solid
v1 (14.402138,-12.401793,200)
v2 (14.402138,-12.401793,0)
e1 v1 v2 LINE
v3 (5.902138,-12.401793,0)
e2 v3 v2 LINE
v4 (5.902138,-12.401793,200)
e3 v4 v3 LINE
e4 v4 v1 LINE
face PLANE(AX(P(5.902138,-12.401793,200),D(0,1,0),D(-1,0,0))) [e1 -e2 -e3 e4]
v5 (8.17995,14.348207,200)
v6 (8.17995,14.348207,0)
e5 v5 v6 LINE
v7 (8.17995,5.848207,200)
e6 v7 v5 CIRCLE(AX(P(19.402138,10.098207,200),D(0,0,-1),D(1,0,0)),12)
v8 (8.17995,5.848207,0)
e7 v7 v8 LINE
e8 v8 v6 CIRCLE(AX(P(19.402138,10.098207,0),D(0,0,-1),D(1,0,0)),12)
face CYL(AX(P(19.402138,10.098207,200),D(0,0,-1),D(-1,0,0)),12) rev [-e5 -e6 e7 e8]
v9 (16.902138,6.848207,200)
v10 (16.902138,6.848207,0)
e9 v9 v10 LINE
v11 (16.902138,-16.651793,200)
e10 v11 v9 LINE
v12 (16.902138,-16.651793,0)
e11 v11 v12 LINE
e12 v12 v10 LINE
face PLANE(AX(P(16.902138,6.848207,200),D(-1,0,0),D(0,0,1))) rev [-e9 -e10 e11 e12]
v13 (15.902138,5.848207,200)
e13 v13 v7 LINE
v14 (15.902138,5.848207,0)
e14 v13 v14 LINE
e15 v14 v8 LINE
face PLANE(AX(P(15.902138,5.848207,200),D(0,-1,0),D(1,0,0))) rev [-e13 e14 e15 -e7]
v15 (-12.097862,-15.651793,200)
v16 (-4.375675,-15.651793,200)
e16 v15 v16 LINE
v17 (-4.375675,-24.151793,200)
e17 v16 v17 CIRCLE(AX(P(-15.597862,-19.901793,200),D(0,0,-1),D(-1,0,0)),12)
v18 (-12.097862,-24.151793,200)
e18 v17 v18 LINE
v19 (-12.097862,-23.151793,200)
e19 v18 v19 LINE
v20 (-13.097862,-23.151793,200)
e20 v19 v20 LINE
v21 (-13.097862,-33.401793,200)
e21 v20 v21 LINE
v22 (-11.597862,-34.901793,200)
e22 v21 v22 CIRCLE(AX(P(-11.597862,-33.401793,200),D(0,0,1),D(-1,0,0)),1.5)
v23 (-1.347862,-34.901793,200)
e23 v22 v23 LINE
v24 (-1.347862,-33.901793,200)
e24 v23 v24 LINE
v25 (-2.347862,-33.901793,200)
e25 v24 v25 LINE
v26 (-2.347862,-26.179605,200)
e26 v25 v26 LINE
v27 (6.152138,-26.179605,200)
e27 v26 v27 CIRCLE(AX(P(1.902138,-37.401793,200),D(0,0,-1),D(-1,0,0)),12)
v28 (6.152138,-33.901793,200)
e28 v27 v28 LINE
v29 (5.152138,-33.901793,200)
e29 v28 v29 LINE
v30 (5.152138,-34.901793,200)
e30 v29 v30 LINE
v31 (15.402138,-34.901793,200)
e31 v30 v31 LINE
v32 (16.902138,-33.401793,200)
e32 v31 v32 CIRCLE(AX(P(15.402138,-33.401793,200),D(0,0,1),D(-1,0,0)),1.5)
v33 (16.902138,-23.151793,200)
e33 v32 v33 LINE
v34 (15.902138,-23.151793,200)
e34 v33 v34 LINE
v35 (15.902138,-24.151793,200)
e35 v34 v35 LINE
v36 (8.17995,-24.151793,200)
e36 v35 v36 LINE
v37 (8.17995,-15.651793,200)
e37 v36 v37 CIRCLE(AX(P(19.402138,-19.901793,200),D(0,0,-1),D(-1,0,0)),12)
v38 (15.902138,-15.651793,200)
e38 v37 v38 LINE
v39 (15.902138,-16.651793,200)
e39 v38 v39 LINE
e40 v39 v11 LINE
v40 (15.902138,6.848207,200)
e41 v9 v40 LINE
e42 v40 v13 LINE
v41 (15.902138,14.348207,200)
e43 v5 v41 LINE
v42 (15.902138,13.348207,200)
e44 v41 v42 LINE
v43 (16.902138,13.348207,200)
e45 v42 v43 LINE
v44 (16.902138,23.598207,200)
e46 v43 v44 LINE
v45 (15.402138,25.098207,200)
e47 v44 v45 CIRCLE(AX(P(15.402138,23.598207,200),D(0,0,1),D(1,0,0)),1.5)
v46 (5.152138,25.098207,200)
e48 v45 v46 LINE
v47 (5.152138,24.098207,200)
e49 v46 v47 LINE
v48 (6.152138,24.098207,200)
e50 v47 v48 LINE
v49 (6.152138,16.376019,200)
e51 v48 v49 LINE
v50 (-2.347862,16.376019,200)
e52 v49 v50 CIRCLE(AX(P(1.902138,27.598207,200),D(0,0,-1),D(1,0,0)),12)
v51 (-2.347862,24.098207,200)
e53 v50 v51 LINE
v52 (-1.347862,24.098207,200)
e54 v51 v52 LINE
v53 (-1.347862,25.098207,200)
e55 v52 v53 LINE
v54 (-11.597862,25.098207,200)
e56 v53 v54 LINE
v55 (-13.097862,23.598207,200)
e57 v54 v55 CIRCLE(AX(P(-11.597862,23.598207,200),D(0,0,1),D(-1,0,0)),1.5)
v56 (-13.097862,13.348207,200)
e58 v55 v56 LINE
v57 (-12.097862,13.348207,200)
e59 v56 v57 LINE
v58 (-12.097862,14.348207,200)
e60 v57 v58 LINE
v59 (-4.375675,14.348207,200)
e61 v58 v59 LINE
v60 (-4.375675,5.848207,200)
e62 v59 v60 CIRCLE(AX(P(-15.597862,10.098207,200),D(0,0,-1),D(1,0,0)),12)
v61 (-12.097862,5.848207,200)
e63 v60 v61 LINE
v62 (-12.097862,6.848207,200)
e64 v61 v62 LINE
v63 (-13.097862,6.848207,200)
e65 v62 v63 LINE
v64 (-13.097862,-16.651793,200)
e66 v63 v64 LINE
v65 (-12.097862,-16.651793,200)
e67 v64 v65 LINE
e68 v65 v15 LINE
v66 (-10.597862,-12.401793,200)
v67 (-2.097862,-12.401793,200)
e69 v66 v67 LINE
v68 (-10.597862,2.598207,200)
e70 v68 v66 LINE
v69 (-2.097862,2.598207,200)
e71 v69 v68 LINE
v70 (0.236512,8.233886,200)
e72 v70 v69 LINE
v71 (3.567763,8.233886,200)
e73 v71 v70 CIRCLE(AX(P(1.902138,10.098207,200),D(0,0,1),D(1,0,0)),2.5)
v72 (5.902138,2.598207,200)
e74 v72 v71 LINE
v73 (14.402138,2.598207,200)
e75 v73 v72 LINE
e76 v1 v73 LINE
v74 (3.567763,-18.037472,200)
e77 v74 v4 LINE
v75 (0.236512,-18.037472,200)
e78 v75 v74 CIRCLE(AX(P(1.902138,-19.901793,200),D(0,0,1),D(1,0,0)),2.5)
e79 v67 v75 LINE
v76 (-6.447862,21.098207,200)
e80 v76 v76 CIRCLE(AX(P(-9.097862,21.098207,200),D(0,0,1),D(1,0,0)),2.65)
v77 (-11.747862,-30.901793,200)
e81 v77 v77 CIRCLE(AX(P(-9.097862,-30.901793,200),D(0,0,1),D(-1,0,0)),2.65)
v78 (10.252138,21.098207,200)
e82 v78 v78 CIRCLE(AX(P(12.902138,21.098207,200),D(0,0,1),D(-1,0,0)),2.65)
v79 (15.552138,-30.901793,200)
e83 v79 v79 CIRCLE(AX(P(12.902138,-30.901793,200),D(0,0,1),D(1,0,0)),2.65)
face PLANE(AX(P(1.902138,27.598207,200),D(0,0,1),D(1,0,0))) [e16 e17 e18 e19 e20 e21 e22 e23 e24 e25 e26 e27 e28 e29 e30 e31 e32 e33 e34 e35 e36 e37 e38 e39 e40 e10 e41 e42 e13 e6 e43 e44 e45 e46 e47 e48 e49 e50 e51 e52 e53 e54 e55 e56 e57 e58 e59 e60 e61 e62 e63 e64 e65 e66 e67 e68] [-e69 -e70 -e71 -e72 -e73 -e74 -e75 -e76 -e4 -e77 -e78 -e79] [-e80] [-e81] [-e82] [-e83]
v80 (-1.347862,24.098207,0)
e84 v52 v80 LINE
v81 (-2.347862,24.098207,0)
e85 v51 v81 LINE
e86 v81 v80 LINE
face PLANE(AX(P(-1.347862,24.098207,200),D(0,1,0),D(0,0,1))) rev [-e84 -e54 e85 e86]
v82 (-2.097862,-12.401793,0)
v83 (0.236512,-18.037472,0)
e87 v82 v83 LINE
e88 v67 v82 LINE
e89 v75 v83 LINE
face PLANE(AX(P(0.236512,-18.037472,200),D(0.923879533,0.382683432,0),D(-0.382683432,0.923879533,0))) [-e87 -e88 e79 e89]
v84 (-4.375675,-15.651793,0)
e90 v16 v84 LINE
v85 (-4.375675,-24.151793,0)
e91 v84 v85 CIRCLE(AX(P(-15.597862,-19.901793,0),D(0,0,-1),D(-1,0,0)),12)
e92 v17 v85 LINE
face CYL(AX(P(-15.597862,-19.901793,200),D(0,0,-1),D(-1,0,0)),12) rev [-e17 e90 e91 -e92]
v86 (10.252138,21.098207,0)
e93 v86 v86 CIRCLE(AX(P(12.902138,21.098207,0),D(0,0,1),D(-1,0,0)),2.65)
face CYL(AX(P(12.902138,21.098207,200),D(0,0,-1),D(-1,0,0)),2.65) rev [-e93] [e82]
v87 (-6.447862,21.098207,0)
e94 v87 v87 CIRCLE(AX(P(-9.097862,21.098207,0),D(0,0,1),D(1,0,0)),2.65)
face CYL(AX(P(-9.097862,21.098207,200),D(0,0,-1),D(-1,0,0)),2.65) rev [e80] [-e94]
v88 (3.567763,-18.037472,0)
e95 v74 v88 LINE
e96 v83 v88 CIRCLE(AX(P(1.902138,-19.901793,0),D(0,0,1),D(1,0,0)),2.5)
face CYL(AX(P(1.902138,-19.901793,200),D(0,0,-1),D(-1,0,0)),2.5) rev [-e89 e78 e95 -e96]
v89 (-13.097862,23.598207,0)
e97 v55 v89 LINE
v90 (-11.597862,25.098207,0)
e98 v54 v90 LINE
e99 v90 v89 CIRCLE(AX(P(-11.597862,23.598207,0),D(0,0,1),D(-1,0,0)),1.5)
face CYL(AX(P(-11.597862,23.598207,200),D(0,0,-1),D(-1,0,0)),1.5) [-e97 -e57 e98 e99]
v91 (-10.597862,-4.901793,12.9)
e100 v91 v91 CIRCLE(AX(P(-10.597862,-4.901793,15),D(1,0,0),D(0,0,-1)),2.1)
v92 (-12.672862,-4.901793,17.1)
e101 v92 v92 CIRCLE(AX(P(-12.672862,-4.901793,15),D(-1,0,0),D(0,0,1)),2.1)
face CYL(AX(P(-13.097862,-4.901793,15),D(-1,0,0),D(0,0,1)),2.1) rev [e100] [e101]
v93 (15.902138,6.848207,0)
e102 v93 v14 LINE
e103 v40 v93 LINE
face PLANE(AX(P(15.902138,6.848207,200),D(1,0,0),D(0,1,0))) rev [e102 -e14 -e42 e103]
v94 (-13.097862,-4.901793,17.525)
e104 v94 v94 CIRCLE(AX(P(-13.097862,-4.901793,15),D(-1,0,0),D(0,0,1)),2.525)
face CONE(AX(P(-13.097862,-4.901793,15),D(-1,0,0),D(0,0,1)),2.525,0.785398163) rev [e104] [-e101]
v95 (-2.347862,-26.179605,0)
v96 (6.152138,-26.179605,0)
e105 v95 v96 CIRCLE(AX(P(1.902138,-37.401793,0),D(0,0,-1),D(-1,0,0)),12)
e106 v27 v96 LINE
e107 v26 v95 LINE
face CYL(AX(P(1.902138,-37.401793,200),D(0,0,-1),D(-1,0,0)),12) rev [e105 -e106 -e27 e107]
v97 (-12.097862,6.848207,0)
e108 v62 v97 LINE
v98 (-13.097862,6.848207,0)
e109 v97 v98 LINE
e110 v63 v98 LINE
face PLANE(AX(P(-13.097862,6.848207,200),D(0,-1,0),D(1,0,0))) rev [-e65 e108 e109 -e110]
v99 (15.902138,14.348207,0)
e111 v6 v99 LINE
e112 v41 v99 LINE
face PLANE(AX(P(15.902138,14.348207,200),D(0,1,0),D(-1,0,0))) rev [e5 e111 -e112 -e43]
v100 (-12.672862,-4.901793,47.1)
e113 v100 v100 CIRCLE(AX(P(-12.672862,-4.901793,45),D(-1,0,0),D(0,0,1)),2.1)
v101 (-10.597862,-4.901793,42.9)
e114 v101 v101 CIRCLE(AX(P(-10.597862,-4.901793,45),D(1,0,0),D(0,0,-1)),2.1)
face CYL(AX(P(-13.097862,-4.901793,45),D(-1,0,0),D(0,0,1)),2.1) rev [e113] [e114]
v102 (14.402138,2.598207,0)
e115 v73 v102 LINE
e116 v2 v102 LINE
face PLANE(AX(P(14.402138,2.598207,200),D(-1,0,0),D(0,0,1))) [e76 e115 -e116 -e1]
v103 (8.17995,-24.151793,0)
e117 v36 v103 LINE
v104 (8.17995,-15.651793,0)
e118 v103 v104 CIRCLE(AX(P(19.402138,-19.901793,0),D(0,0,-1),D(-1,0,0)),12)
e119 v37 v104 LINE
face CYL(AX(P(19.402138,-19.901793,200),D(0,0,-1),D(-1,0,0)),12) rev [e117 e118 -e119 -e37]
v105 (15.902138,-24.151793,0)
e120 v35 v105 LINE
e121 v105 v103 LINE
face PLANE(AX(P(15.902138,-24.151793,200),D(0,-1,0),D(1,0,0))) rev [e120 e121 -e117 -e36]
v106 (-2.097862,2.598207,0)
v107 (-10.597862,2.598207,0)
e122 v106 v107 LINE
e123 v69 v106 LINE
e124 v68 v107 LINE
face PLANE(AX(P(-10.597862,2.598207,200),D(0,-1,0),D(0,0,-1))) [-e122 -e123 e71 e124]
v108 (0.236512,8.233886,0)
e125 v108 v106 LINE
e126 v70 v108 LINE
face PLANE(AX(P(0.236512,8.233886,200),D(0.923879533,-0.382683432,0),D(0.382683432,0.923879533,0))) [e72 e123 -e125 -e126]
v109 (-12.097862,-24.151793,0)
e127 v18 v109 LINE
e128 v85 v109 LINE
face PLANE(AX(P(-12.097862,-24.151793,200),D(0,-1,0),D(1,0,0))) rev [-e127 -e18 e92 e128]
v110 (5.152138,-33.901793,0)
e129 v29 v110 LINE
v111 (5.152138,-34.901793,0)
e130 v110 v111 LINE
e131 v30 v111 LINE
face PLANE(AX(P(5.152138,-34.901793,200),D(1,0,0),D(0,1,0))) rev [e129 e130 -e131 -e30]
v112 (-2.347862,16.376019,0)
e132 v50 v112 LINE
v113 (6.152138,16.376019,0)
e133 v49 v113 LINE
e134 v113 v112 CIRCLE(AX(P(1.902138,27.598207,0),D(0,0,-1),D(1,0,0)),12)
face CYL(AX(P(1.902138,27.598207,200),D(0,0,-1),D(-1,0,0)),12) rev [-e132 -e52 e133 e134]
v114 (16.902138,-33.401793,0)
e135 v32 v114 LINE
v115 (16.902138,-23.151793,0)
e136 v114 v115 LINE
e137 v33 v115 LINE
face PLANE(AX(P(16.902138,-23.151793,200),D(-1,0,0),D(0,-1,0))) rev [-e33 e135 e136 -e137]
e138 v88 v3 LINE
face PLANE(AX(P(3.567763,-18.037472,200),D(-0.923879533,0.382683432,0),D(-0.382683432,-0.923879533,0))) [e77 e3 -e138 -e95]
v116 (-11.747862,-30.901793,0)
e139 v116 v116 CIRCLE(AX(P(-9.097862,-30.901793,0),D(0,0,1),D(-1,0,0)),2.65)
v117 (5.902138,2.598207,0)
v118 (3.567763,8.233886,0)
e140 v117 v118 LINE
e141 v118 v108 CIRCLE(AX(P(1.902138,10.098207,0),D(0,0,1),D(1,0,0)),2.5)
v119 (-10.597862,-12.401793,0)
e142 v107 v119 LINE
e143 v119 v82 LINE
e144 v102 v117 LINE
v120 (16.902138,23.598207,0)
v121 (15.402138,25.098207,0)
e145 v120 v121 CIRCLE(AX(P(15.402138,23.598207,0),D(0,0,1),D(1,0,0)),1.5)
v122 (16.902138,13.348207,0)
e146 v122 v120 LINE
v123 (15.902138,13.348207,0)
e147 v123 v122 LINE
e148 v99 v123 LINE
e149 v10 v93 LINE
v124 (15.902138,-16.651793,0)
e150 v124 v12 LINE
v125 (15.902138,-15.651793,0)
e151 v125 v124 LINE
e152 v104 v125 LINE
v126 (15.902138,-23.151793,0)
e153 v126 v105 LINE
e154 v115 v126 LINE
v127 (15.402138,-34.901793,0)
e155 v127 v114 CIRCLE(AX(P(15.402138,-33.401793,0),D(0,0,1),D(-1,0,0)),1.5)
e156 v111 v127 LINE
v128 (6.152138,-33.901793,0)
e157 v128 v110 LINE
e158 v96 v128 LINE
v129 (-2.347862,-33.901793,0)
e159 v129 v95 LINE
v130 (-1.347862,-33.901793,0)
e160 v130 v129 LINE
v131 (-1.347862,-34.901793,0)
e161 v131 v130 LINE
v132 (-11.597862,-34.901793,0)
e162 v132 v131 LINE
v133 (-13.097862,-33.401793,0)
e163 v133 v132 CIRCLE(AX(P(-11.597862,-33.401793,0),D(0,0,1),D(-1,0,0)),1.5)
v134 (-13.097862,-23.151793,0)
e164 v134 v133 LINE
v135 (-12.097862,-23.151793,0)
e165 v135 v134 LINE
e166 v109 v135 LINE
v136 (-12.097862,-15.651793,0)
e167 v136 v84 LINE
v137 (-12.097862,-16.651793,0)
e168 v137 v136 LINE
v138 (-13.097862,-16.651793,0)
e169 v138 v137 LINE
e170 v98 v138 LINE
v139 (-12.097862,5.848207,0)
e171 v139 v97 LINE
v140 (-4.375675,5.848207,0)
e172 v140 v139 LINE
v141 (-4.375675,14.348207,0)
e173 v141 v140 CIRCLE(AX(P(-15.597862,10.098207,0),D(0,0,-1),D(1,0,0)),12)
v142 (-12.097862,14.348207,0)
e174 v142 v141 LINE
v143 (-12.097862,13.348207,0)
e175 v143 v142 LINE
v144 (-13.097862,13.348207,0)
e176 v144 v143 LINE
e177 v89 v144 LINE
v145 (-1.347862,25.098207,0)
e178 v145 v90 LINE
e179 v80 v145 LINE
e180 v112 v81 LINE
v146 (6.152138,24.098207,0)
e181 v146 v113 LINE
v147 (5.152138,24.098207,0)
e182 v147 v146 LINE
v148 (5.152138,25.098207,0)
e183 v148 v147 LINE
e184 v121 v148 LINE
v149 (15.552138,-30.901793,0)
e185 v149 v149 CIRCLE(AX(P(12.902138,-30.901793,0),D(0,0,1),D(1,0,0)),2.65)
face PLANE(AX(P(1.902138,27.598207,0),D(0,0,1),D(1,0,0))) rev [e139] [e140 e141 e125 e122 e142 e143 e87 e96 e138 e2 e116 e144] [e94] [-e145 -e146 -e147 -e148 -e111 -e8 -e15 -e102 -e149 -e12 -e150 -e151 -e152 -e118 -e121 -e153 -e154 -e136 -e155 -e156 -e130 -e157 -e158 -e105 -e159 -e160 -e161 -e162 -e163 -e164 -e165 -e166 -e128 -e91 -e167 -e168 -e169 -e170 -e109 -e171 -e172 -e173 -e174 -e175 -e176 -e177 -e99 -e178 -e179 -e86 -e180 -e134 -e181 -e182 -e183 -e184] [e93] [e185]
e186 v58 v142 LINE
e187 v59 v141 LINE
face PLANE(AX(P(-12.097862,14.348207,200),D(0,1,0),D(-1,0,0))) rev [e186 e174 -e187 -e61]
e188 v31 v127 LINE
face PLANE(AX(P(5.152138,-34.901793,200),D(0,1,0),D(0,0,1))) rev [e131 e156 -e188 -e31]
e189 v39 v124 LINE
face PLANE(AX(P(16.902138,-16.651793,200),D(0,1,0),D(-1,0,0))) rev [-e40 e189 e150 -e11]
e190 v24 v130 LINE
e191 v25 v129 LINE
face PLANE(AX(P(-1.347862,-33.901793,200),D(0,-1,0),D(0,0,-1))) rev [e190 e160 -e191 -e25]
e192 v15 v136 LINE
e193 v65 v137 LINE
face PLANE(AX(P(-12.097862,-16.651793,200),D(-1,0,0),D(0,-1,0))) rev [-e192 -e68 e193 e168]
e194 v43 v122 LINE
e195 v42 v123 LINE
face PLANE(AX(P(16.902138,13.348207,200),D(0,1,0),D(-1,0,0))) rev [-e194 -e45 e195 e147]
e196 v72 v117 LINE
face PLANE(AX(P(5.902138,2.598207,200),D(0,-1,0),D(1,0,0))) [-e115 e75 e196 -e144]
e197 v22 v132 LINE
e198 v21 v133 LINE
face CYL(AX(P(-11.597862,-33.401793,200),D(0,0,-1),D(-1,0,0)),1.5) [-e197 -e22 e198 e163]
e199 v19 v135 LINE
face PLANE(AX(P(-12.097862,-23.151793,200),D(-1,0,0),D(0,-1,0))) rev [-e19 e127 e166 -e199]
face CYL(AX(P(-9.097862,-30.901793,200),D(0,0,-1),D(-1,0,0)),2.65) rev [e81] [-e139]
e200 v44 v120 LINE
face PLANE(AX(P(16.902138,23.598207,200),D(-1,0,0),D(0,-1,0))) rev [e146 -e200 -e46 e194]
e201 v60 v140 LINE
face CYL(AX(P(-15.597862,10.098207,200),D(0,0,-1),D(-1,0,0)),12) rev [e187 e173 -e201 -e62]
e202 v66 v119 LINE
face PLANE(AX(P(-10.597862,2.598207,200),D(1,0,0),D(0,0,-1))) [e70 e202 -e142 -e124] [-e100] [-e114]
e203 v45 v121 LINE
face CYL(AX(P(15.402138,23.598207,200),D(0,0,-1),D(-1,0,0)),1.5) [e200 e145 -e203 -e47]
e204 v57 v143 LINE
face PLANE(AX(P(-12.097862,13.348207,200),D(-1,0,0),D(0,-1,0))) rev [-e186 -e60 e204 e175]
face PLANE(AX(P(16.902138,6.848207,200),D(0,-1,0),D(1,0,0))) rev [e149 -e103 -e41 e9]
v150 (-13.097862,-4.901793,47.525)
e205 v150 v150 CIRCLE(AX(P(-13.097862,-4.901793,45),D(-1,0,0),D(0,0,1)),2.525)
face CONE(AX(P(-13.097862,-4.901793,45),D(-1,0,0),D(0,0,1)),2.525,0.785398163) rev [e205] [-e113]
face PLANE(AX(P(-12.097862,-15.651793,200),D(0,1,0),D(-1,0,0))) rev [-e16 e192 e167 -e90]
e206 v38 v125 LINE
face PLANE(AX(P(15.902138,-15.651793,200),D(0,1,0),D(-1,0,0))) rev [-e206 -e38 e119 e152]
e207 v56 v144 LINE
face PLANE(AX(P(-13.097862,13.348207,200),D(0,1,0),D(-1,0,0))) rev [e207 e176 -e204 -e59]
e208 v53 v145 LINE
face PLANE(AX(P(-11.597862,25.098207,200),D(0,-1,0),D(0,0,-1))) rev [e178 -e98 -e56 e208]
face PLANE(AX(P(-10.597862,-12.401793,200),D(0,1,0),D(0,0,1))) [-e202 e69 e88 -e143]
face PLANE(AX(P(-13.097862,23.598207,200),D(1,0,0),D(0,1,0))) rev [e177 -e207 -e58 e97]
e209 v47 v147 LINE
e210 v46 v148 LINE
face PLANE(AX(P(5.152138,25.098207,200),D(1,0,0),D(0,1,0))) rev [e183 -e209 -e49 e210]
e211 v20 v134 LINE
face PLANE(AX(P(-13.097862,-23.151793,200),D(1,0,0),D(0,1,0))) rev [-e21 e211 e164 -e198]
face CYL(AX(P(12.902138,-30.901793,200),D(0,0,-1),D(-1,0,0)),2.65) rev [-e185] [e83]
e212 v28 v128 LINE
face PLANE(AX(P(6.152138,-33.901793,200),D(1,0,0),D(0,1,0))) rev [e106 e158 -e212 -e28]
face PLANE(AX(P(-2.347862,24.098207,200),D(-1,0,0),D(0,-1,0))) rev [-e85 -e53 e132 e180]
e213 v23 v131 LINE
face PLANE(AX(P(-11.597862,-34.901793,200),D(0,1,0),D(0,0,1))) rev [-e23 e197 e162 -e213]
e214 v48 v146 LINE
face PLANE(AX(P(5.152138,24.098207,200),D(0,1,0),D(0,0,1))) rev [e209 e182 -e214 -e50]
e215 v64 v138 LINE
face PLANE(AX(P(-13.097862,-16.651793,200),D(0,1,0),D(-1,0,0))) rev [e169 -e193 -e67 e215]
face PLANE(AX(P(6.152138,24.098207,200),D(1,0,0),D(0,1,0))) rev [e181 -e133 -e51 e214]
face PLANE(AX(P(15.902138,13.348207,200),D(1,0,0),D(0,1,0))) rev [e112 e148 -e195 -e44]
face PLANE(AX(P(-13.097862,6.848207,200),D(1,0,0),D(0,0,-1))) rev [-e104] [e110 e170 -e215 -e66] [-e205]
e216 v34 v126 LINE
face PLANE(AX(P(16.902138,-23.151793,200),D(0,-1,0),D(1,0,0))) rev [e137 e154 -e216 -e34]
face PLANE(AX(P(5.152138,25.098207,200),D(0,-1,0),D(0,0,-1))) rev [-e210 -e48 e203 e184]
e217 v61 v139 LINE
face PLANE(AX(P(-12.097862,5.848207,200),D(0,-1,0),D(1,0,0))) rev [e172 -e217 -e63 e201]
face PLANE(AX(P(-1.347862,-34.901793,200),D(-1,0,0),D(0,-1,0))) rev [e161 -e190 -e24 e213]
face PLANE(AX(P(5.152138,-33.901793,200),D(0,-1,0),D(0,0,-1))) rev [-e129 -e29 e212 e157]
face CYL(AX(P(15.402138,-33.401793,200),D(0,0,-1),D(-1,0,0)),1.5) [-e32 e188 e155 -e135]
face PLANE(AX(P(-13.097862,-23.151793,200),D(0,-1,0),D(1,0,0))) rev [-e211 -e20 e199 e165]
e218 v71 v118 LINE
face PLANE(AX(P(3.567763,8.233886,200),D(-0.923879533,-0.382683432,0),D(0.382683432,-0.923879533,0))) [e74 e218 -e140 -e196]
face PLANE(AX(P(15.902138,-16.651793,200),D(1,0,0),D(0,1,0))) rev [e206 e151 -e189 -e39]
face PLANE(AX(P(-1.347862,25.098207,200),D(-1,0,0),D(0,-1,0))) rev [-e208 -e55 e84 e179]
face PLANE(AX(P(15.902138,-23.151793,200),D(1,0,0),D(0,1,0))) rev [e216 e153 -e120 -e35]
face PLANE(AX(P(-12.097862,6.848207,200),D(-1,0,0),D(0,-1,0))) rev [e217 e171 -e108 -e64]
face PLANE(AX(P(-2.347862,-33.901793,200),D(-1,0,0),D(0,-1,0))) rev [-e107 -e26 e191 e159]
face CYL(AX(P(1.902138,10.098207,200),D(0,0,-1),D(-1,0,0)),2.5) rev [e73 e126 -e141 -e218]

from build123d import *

# Parameters (mm, degrees)
SKETCH1_2_R                 = 2.65
EXTRUDE_1_DEPTH             = 200
HOLE_WIZARD_M5_1_AT_2_COUNT = 2
HOLE_WIZARD_M5_1_AT_2_PITCH = 30


# Read off the part's stored shape, not the designer's step: 30 x 60G x R1.5<1>
with BuildPart() as part:
    # Sketch1<2> → 凸台-拉伸1 (new body)
    with BuildSketch(Plane(origin=(1.902137601, -4.901792835, 0), x_dir=(1, 0, 0), z_dir=(0, 0, 1))):
        with BuildLine():
            Line((-3.25, 30), (-3.25, 29))
            Line((-3.25, 29), (-4.25, 29))
            Line((-4.25, 29), (-4.25, 21.277812156))
            ThreePointArc((-4.25, 21.277812156), (0, 20.5), (4.25, 21.277812156))
            Line((4.25, 21.277812156), (4.25, 29))
            Line((4.25, 29), (3.25, 29))
            Line((3.25, 29), (3.25, 30))
            Line((3.25, 30), (13.5, 30))
            ThreePointArc((13.5, 30), (14.560660172, 29.560660172), (15, 28.5))
            Line((15, 28.5), (15, 18.25))
            Line((15, 18.25), (14, 18.25))
            Line((14, 18.25), (14, 19.25))
            Line((14, 19.25), (6.277812156, 19.25))
            ThreePointArc((6.277812156, 19.25), (5.5, 15), (6.277812156, 10.75))
            Line((6.277812156, 10.75), (14, 10.75))
            Line((14, 10.75), (14, 11.75))
            Line((14, 11.75), (15, 11.75))
            Line((15, 11.75), (15, -11.75))
            Line((15, -11.75), (14, -11.75))
            Line((14, -11.75), (14, -10.75))
            Line((14, -10.75), (6.277812156, -10.75))
            ThreePointArc((6.277812156, -10.75), (5.5, -15), (6.277812156, -19.25))
            Line((6.277812156, -19.25), (14, -19.25))
            Line((14, -19.25), (14, -18.25))
            Line((14, -18.25), (15, -18.25))
            Line((15, -18.25), (15, -28.5))
            ThreePointArc((15, -28.5), (14.560660172, -29.560660172), (13.5, -30))
            Line((13.5, -30), (3.25, -30))
            Line((3.25, -30), (3.25, -29))
            Line((3.25, -29), (4.25, -29))
            Line((4.25, -29), (4.25, -21.277812156))
            ThreePointArc((4.25, -21.277812156), (0, -20.5), (-4.25, -21.277812156))
            Line((-4.25, -21.277812156), (-4.25, -29))
            Line((-4.25, -29), (-3.25, -29))
            Line((-3.25, -29), (-3.25, -30))
            Line((-3.25, -30), (-13.5, -30))
            ThreePointArc((-13.5, -30), (-14.560660172, -29.560660172), (-15, -28.5))
            Line((-15, -28.5), (-15, -18.25))
            Line((-15, -18.25), (-14, -18.25))
            Line((-14, -18.25), (-14, -19.25))
            Line((-14, -19.25), (-6.277812156, -19.25))
            ThreePointArc((-6.277812156, -19.25), (-5.5, -15), (-6.277812156, -10.75))
            Line((-6.277812156, -10.75), (-14, -10.75))
            Line((-14, -10.75), (-14, -11.75))
            Line((-14, -11.75), (-15, -11.75))
            Line((-15, -11.75), (-15, 11.75))
            Line((-15, 11.75), (-14, 11.75))
            Line((-14, 11.75), (-14, 10.75))
            Line((-14, 10.75), (-6.277812156, 10.75))
            ThreePointArc((-6.277812156, 10.75), (-5.5, 15), (-6.277812156, 19.25))
            Line((-6.277812156, 19.25), (-14, 19.25))
            Line((-14, 19.25), (-14, 18.25))
            Line((-14, 18.25), (-15, 18.25))
            Line((-15, 18.25), (-15, 28.5))
            ThreePointArc((-15, 28.5), (-14.560660172, 29.560660172), (-13.5, 30))
            Line((-13.5, 30), (-3.25, 30))
        make_face()
        with Locations((-11, 26)):
            Circle(SKETCH1_2_R, mode=Mode.SUBTRACT)
        with Locations(Location((11, 26, 0), (0, 0, 180))):
            Circle(SKETCH1_2_R, mode=Mode.SUBTRACT)
        with Locations((11, -26)):
            Circle(SKETCH1_2_R, mode=Mode.SUBTRACT)
        with Locations(Location((-11, -26, 0), (0, 0, 180))):
            Circle(SKETCH1_2_R, mode=Mode.SUBTRACT)
        with BuildLine():
            Line((-12.5, 7.5), (-4, 7.5))
            Line((-4, 7.5), (-1.665625283, 13.135679101))
            ThreePointArc((-1.665625283, 13.135679101), (0, 17.5), (1.665625283, 13.135679101))
            Line((1.665625283, 13.135679101), (4, 7.5))
            Line((4, 7.5), (12.5, 7.5))
            Line((12.5, 7.5), (12.5, -7.5))
            Line((12.5, -7.5), (4, -7.5))
            Line((4, -7.5), (1.665625283, -13.135679101))
            ThreePointArc((1.665625283, -13.135679101), (0, -17.5), (-1.665625283, -13.135679101))
            Line((-1.665625283, -13.135679101), (-4, -7.5))
            Line((-4, -7.5), (-12.5, -7.5))
            Line((-12.5, -7.5), (-12.5, 7.5))
        make_face(mode=Mode.SUBTRACT)
    extrude(amount=EXTRUDE_1_DEPTH)

    # 草图4 → M5 螺纹孔1 (revolve, cut)
    with BuildSketch(Plane(origin=(-13.097862399, -4.901792835, 45), x_dir=(0, 0, 1), z_dir=(0, 1, 0))):
        Polygon((0, 0), (0, 2.5), (2.1, 2.5), (2.1, 0.425), (2.525, 0), align=None)
    hole_wizard_m5_1 = revolve(axis=Axis((-19.447862399, -4.901792835, 45), (1, 0, 0)), mode=Mode.SUBTRACT)

    # M5 螺纹孔1 at 2: M5 螺纹孔1 ×2
    with Locations(*[(0, 0, -i * HOLE_WIZARD_M5_1_AT_2_PITCH) for i in range(1, HOLE_WIZARD_M5_1_AT_2_COUNT)]):
        add(hole_wizard_m5_1, mode=Mode.SUBTRACT)


solid = part.part
